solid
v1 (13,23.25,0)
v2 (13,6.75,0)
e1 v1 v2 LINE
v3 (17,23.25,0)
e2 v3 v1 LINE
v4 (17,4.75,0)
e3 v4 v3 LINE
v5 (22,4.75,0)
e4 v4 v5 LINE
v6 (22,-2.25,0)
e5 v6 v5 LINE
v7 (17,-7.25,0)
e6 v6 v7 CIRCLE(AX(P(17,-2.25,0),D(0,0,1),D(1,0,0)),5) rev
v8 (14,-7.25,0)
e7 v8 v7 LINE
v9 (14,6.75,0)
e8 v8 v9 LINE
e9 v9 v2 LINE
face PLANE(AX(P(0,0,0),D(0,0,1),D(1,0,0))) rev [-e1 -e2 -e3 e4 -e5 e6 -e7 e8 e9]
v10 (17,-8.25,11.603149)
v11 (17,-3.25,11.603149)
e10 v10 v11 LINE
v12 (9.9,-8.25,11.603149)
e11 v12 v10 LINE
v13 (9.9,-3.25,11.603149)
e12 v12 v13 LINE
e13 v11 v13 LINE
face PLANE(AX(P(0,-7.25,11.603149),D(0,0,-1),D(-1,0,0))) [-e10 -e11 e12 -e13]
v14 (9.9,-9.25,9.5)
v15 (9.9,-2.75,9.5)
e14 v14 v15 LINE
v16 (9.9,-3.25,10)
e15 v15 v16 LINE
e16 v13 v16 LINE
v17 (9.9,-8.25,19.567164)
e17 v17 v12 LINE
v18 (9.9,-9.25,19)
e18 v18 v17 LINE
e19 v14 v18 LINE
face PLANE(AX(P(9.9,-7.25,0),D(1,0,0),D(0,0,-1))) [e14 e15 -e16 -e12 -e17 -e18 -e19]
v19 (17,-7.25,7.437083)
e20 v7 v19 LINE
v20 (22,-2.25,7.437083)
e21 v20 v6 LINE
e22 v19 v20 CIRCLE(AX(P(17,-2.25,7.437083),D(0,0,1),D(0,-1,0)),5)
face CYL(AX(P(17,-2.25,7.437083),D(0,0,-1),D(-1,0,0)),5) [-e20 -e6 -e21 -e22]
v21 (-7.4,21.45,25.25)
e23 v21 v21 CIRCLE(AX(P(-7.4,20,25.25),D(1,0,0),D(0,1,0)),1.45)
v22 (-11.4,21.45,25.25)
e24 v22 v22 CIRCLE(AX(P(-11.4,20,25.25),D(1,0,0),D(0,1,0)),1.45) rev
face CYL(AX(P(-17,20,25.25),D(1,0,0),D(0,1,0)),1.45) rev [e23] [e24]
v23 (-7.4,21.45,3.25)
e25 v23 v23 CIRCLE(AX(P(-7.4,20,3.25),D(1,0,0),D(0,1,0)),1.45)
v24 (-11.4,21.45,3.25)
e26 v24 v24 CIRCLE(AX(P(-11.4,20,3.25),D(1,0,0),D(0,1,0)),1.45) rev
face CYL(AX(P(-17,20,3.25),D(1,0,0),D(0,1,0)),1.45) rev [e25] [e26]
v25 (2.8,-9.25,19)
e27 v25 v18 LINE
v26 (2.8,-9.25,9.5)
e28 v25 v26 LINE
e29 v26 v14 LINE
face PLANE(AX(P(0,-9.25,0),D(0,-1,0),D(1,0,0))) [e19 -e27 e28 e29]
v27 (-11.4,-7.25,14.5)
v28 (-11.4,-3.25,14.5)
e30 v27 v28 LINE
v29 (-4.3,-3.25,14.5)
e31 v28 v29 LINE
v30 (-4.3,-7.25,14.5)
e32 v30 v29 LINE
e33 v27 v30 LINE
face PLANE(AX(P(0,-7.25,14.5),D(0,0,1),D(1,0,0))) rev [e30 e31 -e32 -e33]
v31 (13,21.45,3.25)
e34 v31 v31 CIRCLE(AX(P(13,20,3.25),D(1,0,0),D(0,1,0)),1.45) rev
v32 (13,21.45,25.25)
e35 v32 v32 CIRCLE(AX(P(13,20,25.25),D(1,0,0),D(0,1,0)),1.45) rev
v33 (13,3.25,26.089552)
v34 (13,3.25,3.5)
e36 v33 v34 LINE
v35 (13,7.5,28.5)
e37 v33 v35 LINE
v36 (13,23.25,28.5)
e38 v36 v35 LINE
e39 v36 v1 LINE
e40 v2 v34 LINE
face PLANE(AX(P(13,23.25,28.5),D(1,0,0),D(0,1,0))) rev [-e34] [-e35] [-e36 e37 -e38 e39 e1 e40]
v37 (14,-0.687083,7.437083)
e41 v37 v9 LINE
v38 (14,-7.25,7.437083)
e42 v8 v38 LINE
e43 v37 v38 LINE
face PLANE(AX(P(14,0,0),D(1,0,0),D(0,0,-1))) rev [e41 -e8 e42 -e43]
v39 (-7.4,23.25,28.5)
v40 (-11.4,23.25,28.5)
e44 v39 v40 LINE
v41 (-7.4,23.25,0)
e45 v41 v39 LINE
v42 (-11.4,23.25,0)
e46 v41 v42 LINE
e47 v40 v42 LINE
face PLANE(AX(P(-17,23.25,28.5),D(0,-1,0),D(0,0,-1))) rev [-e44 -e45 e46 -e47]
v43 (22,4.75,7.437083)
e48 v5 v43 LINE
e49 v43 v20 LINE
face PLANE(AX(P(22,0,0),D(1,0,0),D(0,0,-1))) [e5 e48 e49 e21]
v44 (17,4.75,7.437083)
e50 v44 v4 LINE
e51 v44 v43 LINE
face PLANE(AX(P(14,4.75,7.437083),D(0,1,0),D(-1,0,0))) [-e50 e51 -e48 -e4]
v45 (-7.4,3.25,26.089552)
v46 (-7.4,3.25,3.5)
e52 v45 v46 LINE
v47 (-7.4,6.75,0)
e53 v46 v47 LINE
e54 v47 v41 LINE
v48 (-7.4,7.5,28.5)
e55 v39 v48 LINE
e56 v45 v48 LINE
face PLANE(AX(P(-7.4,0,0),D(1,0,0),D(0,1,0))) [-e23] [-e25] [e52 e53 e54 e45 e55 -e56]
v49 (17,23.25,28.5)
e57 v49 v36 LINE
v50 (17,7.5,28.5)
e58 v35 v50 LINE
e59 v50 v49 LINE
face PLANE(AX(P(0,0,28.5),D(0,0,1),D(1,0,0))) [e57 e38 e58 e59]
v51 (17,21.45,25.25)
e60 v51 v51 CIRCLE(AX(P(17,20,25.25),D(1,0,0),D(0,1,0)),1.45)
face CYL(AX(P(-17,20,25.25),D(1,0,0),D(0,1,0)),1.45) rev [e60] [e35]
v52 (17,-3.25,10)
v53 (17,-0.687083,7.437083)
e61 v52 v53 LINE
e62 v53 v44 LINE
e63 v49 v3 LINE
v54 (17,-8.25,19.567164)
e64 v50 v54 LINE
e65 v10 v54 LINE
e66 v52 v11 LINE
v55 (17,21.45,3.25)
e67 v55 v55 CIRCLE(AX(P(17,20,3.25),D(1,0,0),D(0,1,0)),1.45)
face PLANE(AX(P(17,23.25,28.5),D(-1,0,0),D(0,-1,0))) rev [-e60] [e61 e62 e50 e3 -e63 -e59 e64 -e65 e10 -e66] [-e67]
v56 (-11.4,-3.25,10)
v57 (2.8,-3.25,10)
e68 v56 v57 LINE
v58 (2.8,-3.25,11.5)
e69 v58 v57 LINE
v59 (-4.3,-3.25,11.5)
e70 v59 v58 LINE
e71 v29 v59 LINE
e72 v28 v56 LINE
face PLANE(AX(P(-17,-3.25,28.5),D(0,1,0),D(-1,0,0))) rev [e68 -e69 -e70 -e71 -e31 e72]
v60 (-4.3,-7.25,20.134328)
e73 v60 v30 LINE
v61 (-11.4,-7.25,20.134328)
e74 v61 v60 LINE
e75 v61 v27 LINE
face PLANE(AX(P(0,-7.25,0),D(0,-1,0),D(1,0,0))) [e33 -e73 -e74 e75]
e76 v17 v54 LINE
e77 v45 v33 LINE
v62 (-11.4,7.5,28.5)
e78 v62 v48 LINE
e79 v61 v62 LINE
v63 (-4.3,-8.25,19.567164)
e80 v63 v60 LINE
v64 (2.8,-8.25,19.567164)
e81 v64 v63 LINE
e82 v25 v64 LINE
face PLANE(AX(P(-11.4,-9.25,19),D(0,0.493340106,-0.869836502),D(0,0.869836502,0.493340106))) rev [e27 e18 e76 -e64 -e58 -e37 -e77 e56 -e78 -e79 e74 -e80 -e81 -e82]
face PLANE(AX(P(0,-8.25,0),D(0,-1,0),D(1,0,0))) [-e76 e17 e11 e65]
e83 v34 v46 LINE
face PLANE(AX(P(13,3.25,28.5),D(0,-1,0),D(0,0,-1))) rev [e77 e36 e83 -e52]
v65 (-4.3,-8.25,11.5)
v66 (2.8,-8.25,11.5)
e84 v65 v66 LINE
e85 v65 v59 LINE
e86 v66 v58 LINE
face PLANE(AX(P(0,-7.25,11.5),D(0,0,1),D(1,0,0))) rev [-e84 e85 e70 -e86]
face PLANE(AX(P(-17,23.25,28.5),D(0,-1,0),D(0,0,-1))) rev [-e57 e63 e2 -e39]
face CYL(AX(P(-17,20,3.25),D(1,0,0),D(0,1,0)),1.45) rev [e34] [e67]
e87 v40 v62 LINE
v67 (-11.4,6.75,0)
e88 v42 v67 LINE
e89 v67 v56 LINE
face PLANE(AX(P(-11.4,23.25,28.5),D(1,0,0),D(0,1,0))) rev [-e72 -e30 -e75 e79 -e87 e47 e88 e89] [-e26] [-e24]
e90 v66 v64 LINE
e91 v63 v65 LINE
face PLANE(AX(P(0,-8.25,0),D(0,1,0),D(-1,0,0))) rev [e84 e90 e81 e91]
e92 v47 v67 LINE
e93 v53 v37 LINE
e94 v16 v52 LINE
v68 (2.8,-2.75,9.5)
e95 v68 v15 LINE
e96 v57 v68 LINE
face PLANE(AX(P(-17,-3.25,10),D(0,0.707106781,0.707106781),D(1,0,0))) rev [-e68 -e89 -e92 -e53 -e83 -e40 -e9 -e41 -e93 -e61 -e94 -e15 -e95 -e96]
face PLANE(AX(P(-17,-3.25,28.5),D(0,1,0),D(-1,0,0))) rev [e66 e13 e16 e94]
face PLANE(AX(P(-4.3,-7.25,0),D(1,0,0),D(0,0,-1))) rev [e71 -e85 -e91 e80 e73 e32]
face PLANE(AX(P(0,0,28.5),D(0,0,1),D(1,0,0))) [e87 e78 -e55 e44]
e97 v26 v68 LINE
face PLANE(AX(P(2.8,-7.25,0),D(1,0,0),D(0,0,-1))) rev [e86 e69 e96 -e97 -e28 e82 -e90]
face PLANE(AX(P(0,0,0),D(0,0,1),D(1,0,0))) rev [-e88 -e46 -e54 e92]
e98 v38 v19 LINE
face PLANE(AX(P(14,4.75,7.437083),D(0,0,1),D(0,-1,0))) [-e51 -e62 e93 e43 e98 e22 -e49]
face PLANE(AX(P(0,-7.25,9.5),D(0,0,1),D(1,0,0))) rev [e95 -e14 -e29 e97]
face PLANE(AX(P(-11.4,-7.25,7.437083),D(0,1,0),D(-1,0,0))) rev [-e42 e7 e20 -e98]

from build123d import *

# Parameters (mm, degrees)
SKETCH1_W                = 34
SKETCH1_H                = 46.5
BOSS_EXTRUDE1_DEPTH      = 28.5
SKETCH2_R                = 1.45
CUT_EXTRUDE1_DEPTH       = 51.088047476
SKETCH3_W                = 28.5
SKETCH3_H                = 20
CUT_EXTRUDE2_DEPTH       = 51.088047476
SKETCH4_W                = 26
SKETCH4_H                = 20
CUT_EXTRUDE3_DEPTH       = 41.519285532
BOSS_EXTRUDE2_DEPTH      = 5
BOSS_EXTRUDE2_DEPTH_BACK = 3
SKETCH5_W                = 7.437082776
SKETCH5_H                = 15
BOSS_EXTRUDE3_START      = 5.6
SKETCH6_W                = 28.5
SKETCH6_H                = 20
SKETCH6_R                = 1.45
BOSS_EXTRUDE3_DEPTH      = 5.6
SKETCH7_W                = 5.6
SKETCH7_H                = 26.5
CUT_EXTRUDE4_DEPTH       = 43.858050586
SKETCH9_W                = 7.1
SKETCH9_H                = 14
SKETCH9_H_2              = 16.896851025
BOSS_EXTRUDE4_DEPTH      = 4
SKETCH10_W               = 7.1
SKETCH10_H               = 17
BOSS_EXTRUDE5_DEPTH      = 1
SKETCH11_W               = 7.1
SKETCH11_H               = 19
BOSS_EXTRUDE6_DEPTH      = 2
SKETCH12_W               = 7.1
SKETCH12_H               = 16.896851025
BOSS_EXTRUDE7_DEPTH      = 1
CUT_EXTRUDE5_DEPTH       = 47.469048839
CUT_EXTRUDE5_DEPTH_BACK  = 47.469048839
SKETCH13_W               = 7.437082776
SKETCH13_H               = 3
FILLET1_R                = 5
CHAMFER1_START           = -11.4
CHAMFER1_DEPTH           = 25.4
CHAMFER1_START_2         = 9.9
CHAMFER1_2_DEPTH         = 12.1
CHAMFER1_3_DEPTH         = 14.2


with BuildPart() as part:
    # Sketch1 → Boss-Extrude1 (new body)
    with BuildSketch(Plane.XY):
        Rectangle(SKETCH1_W, SKETCH1_H)
    extrude(amount=BOSS_EXTRUDE1_DEPTH)

    # Sketch2 → Cut-Extrude1 (cut, through all)
    with BuildSketch(Plane(origin=(17, 0, 0), x_dir=(0, 0, -1), z_dir=(1, 0, 0))):
        with Locations(Location((-25.25, 20, 0), (0, 0, 90))):
            Circle(SKETCH2_R)
        with Locations(Location((-3.25, 20, 0), (0, 0, 90))):
            Circle(SKETCH2_R)
        with Locations(Location((-3.25, -20, 0), (0, 0, 90))):
            Circle(SKETCH2_R)
        with Locations(Location((-25.25, -20, 0), (0, 0, 90))):
            Circle(SKETCH2_R)
    extrude(amount=-CUT_EXTRUDE1_DEPTH, mode=Mode.SUBTRACT)

    # Sketch3 → Cut-Extrude2 (cut, through all)
    with BuildSketch(Plane(origin=(17, 0, 0), x_dir=(0, 0, -1), z_dir=(1, 0, 0))):
        with Locations((-14.25, -13.25)):
            Rectangle(SKETCH3_W, SKETCH3_H)
    extrude(amount=-CUT_EXTRUDE2_DEPTH, mode=Mode.SUBTRACT)

    # Sketch4 → Cut-Extrude3 (cut, through all)
    with BuildSketch(Plane(origin=(0, 0, 0), x_dir=(-1, 0, 0), z_dir=(0, 0, -1))):
        with Locations((0, 13.25)):
            Rectangle(SKETCH4_W, SKETCH4_H)
    extrude(amount=-CUT_EXTRUDE3_DEPTH, mode=Mode.SUBTRACT)

    # Sketch5 → Boss-Extrude2 (add, two sides: drawn at the far end of the back side and taken through both)
    with BuildSketch(Plane(origin=(17, 0, 0), x_dir=(0, 0, -1), z_dir=(1, 0, 0)).offset(-BOSS_EXTRUDE2_DEPTH_BACK)):
        with Locations((-3.718541388, -2.75)):
            Rectangle(SKETCH5_W, SKETCH5_H)
    extrude(amount=BOSS_EXTRUDE2_DEPTH + BOSS_EXTRUDE2_DEPTH_BACK)

    # Sketch6 → Boss-Extrude3 (add)
    with BuildSketch(Plane(origin=(-13, 0, 0), x_dir=(0, 0, -1), z_dir=(1, 0, 0)).offset(BOSS_EXTRUDE3_START)):
        with Locations((-14.25, 13.25)):
            Rectangle(SKETCH6_W, SKETCH6_H)
        with Locations(Location((-25.25, 20, 0), (0, 0, 90))):
            Circle(SKETCH6_R, mode=Mode.SUBTRACT)
        with Locations(Location((-3.25, 20, 0), (0, 0, 90))):
            Circle(SKETCH6_R, mode=Mode.SUBTRACT)
    extrude(amount=-BOSS_EXTRUDE3_DEPTH)

    # Sketch7 → Cut-Extrude4 (cut, through all)
    with BuildSketch(Plane(origin=(0, 0, 0), x_dir=(-1, 0, 0), z_dir=(0, 0, -1))):
        with Locations((14.2, 10)):
            Rectangle(SKETCH7_W, SKETCH7_H)
    extrude(amount=-CUT_EXTRUDE4_DEPTH, mode=Mode.SUBTRACT)

    # Sketch9 → Boss-Extrude4 (add)
    with BuildSketch(Plane.XZ.offset(3.25)):
        with Locations((-7.85, 21.5)):
            Rectangle(SKETCH9_W, SKETCH9_H)
        Polygon((2.8, 28.5), (-4.3, 28.5), (-4.3, 14.5), (-4.3, 11.5), (2.8, 11.5), align=None)
        with Locations((13.45, 20.051574487)):
            Rectangle(SKETCH9_W, SKETCH9_H_2)
        Polygon((9.9, 28.5), (2.8, 28.5), (2.8, 11.5), (2.8, 9.5), (9.9, 9.5), (9.9, 11.603148975), align=None)
    extrude(amount=BOSS_EXTRUDE4_DEPTH)

    # Sketch10 → Boss-Extrude5 (add)
    with BuildSketch(Plane.XZ.offset(7.25)):
        with Locations((-0.75, 20)):
            Rectangle(SKETCH10_W, SKETCH10_H)
    extrude(amount=BOSS_EXTRUDE5_DEPTH)

    # Sketch11 → Boss-Extrude6 (add)
    with BuildSketch(Plane.XZ.offset(7.25)):
        with Locations((6.35, 19)):
            Rectangle(SKETCH11_W, SKETCH11_H)
    extrude(amount=BOSS_EXTRUDE6_DEPTH)

    # Sketch12 → Boss-Extrude7 (add)
    with BuildSketch(Plane.XZ.offset(7.25)):
        with Locations((13.45, 20.051574487)):
            Rectangle(SKETCH12_W, SKETCH12_H)
    extrude(amount=BOSS_EXTRUDE7_DEPTH)

    # Sketch13 → Cut-Extrude5 (cut, two sides: drawn at the far end of the back side and taken through both)
    with BuildSketch(Plane(origin=(17, 0, 0), x_dir=(0, 0, -1), z_dir=(1, 0, 0)).offset(-CUT_EXTRUDE5_DEPTH_BACK)):
        Polygon((-19, -9.25), (-28.5, 7.5), (-28.5, -9.25), align=None)
        with Locations((-3.718541388, -8.75)):
            Rectangle(SKETCH13_W, SKETCH13_H)
    extrude(amount=CUT_EXTRUDE5_DEPTH + CUT_EXTRUDE5_DEPTH_BACK, mode=Mode.SUBTRACT)

    # Fillet1
    fillet1_edges = [part.edges().sort_by_distance(p)[0] for p in [
        (22, -7.25, 3.718541388),
    ]]
    fillet(fillet1_edges, radius=FILLET1_R)

    # Chamfer1: read off the stored shape, not the designer's step
    # Chamfer1 outline → Chamfer1 (cut)
    with BuildSketch(Plane.YZ.offset(CHAMFER1_START)):
        Polygon((-2.75, 9.5), (-3.25, 9.5), (-3.25, 0), (6.75, 0), align=None)
    extrude(amount=CHAMFER1_DEPTH, mode=Mode.SUBTRACT)

    # Chamfer1 2 outline → Chamfer1 2 (cut)
    with BuildSketch(Plane.YZ.offset(CHAMFER1_START_2)):
        Polygon((-3.25, 7.437082776), (-0.687082776, 7.437082776), (-3.25, 10), align=None)
    extrude(amount=CHAMFER1_2_DEPTH, mode=Mode.SUBTRACT)

    # Chamfer1 3 outline → Chamfer1 3 (cut)
    with BuildSketch(Plane.YZ.offset(CHAMFER1_START)):
        Polygon((-3.25, 9.5), (-2.75, 9.5), (-3.25, 10), align=None)
    extrude(amount=CHAMFER1_3_DEPTH, mode=Mode.SUBTRACT)


solid = part.part
